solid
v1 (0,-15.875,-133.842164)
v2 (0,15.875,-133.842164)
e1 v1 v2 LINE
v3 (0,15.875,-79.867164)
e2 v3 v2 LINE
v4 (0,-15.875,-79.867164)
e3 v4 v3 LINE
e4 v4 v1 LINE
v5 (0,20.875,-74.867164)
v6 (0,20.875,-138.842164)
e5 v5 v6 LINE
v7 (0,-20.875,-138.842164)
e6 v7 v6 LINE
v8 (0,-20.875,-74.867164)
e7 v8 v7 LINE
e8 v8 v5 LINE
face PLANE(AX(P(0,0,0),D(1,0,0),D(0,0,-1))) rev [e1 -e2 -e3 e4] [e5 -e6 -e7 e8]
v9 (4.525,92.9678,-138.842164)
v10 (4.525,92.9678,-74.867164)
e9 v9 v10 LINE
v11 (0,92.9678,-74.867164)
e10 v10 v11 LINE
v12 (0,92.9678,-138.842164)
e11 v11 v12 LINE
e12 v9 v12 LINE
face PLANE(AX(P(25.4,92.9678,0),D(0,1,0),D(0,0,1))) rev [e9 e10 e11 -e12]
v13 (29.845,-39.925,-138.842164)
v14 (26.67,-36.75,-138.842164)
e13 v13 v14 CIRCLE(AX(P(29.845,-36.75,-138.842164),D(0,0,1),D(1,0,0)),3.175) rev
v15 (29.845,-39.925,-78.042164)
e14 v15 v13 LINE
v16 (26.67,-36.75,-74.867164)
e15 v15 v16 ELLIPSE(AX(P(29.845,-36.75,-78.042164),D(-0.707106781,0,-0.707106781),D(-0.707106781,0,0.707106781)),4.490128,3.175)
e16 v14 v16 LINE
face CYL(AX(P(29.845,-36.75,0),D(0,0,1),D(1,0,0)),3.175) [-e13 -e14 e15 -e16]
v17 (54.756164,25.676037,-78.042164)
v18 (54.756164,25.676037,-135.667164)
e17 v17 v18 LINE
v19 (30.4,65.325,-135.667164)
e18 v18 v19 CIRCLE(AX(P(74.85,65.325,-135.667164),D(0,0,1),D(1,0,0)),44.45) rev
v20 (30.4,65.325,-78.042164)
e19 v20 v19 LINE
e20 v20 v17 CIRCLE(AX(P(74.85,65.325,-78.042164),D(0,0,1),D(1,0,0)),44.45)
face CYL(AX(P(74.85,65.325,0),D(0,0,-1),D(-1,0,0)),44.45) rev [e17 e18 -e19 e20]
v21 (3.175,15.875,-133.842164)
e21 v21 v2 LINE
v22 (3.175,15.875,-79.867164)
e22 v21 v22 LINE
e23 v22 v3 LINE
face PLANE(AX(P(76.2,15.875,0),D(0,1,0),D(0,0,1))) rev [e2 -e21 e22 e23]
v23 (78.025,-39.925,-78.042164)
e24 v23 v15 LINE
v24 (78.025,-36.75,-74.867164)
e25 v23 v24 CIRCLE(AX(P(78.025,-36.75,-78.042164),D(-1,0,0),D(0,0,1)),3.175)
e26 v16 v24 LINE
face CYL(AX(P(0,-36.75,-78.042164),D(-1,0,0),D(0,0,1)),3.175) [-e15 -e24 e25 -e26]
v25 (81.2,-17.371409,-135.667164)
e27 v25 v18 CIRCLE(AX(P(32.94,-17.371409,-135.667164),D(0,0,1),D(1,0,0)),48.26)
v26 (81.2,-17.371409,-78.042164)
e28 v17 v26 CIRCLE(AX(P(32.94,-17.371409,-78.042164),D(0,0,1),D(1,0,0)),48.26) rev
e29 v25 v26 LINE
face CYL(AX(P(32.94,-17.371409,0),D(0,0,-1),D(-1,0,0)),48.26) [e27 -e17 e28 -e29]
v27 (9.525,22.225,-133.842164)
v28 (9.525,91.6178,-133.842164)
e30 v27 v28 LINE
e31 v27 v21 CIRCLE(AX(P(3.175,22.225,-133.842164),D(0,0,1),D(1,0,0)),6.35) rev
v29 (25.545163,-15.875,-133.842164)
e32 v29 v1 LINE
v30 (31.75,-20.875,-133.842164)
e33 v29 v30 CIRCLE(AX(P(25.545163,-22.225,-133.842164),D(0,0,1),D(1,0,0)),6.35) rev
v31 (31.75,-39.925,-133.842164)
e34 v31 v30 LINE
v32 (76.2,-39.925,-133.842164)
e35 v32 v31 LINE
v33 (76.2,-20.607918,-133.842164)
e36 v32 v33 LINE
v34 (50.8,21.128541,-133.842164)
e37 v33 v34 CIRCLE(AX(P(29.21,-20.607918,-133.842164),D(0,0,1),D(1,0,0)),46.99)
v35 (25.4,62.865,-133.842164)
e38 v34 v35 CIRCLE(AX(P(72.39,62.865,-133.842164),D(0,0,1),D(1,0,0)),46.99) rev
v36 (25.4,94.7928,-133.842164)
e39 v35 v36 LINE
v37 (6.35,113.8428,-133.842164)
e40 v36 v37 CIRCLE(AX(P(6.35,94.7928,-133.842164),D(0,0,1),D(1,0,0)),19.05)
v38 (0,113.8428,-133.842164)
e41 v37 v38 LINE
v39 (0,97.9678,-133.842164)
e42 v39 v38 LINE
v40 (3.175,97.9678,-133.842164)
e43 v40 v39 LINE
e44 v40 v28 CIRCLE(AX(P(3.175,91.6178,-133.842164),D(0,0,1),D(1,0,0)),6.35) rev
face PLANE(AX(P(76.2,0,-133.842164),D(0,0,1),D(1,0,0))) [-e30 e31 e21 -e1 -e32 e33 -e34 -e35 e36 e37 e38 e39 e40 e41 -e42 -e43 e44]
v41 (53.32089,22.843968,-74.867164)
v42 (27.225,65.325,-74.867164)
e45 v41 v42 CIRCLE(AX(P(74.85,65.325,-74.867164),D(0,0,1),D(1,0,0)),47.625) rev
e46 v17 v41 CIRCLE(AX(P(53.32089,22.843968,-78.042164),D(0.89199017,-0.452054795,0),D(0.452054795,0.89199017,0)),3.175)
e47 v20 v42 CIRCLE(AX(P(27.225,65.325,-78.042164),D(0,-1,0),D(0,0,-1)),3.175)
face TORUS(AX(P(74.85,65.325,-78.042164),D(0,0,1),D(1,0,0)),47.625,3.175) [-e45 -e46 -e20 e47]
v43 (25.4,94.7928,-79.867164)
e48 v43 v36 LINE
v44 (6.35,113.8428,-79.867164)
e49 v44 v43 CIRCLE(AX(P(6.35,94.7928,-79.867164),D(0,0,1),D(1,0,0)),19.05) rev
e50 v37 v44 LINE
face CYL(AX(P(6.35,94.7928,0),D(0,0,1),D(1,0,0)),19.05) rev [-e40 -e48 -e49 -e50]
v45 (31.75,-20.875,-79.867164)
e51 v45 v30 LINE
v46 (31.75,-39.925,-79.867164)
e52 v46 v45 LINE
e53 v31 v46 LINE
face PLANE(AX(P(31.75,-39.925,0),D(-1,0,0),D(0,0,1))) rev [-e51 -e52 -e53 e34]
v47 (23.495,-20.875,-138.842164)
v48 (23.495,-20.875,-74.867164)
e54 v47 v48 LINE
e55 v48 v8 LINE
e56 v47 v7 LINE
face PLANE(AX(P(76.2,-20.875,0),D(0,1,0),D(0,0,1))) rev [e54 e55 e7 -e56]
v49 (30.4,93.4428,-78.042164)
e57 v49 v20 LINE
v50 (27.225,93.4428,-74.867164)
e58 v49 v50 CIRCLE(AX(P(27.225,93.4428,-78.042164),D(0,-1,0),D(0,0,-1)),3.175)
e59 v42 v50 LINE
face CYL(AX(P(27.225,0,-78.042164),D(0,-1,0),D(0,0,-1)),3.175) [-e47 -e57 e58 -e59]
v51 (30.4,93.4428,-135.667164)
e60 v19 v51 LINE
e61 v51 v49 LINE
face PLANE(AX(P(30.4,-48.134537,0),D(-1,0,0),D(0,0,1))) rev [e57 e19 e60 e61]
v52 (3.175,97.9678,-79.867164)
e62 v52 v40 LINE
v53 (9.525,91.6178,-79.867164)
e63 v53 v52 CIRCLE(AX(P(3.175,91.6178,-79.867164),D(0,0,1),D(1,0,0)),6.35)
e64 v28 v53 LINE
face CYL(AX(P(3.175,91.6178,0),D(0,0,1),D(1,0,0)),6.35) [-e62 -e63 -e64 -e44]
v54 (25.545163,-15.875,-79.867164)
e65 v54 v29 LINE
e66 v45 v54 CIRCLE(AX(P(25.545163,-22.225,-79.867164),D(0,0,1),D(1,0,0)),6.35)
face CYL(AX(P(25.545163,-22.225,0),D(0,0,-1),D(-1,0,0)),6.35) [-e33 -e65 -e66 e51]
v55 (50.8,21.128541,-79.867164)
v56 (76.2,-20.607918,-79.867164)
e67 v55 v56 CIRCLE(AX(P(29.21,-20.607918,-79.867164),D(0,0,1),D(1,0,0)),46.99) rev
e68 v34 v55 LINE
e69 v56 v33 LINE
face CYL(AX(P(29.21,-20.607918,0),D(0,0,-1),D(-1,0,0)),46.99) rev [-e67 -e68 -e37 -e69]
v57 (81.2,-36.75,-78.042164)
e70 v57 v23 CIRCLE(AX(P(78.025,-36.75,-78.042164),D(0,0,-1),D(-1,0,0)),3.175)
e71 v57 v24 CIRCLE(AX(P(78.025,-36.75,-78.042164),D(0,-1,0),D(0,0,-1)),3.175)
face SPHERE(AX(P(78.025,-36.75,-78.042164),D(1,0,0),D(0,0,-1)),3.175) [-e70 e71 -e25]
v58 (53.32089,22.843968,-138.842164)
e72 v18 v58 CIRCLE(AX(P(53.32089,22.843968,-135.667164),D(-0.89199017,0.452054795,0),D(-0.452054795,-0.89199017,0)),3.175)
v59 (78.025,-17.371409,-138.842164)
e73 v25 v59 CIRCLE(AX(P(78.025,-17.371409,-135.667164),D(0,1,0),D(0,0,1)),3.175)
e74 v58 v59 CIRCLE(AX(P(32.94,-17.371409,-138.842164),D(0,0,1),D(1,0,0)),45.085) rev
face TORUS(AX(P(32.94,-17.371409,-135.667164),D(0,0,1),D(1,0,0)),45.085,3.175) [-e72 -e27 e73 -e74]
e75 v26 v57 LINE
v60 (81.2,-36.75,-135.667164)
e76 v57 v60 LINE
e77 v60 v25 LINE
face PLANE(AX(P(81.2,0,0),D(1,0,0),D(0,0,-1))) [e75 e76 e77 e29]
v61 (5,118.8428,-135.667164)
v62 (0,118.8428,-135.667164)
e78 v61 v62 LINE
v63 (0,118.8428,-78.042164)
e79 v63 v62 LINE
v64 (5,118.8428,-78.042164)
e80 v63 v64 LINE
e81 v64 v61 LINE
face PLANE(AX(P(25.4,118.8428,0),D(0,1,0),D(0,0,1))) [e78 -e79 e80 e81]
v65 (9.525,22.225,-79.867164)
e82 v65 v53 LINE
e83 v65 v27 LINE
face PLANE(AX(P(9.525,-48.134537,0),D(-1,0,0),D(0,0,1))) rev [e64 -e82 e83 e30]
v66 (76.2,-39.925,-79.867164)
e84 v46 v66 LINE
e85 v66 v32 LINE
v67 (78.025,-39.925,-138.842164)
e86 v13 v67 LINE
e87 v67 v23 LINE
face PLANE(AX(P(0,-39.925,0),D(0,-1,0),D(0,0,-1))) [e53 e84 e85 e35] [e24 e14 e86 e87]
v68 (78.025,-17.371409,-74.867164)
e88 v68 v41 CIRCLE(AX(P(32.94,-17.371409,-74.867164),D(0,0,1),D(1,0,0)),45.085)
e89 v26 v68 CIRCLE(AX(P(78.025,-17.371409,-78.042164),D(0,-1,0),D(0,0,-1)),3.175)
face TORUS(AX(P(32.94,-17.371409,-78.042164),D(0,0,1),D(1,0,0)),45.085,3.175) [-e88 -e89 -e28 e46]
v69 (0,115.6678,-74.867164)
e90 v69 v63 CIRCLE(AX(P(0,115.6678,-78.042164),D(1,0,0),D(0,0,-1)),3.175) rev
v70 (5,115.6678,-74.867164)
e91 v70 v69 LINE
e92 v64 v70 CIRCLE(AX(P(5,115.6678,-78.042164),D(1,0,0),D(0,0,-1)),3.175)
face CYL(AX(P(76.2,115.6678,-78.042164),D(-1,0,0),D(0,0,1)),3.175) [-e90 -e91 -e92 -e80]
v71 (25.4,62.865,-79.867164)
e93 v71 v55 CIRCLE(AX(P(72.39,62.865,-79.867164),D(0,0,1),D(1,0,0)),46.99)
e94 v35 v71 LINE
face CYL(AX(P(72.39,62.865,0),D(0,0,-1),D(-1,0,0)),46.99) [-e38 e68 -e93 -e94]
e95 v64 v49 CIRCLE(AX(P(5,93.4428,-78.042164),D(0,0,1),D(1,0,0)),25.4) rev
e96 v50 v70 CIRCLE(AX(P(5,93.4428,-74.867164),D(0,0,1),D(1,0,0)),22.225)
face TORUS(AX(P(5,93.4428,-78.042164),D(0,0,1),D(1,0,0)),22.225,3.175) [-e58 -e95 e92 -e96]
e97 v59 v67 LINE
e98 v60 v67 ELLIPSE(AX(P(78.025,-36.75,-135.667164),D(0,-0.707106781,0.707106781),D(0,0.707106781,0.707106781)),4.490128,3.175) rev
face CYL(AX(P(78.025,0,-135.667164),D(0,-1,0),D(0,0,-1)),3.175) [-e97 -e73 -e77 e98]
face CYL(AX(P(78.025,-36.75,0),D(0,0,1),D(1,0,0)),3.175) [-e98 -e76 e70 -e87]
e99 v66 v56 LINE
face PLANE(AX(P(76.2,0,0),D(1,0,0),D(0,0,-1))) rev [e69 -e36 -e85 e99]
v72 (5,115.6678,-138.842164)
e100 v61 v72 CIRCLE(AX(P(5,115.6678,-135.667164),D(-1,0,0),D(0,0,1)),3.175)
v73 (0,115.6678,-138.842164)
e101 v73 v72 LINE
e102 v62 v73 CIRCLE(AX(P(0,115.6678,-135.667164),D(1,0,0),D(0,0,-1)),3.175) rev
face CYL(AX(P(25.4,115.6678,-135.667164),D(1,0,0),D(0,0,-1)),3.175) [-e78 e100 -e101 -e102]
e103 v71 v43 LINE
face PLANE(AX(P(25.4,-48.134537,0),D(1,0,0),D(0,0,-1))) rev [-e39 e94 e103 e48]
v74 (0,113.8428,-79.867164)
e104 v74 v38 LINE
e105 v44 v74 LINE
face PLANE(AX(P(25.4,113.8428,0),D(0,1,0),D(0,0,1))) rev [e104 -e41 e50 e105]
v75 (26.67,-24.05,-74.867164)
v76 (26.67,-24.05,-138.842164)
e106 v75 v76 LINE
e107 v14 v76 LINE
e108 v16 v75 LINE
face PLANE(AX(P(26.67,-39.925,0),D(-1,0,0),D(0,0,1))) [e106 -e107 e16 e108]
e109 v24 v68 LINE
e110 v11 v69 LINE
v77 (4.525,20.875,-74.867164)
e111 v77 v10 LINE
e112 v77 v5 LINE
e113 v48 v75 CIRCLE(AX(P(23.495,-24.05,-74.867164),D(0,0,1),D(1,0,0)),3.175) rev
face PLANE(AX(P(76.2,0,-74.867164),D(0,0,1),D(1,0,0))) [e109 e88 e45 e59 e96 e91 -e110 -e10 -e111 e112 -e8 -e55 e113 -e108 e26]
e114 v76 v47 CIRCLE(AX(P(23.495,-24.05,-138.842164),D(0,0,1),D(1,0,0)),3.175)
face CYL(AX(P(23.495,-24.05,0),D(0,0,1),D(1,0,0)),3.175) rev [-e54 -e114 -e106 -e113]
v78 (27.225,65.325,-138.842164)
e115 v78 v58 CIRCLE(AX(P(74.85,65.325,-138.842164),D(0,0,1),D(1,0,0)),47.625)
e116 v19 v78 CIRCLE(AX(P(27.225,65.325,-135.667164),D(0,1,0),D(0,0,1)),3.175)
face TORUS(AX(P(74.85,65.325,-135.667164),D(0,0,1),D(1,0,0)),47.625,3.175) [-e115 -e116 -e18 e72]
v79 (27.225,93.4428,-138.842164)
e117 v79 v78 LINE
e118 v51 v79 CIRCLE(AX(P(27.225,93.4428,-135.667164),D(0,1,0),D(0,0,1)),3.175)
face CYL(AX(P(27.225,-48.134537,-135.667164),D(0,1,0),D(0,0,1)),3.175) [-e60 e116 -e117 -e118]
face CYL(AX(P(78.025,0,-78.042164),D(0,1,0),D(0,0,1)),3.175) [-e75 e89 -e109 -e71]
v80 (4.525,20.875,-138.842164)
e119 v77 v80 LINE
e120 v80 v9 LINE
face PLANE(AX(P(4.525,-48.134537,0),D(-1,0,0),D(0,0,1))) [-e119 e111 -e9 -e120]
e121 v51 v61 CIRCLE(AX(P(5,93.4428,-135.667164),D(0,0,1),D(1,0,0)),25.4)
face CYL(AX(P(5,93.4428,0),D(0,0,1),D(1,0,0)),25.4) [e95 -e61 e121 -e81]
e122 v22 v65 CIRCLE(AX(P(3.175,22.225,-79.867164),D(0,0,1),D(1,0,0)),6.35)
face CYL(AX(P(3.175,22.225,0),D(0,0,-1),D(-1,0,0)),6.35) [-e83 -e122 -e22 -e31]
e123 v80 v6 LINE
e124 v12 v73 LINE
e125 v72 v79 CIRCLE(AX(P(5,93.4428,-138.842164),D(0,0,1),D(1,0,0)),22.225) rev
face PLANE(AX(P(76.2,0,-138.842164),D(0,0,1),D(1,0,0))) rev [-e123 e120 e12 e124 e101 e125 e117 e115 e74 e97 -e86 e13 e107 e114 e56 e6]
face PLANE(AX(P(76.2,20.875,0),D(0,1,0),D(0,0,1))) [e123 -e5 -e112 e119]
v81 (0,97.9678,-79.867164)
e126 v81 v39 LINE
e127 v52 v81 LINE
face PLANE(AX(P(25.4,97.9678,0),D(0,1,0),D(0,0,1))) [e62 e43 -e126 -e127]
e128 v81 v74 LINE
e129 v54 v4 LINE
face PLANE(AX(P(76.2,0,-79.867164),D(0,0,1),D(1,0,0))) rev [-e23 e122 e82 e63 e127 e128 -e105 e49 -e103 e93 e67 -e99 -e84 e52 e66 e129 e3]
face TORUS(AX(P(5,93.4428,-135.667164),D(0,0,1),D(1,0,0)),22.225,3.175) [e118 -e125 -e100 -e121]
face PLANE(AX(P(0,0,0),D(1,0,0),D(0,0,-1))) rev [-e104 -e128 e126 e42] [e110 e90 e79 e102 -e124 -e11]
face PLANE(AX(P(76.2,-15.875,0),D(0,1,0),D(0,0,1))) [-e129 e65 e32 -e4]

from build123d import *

# Parameters (mm, degrees)
SKETCH1_W           = 53.975
SKETCH1_H           = 31.75
BOSS_EXTRUDE1_DEPTH = 76.2
SHELL1_T            = 5
SKETCH2_W           = 44.45
SKETCH2_H           = 53.975
CUT_EXTRUDE1_DEPTH  = 5
FILLET2_R           = 6.35
SKETCH3_W           = 54.53
SKETCH3_H           = 63.975
SKETCH3_W_2         = 44.45
SKETCH3_H_2         = 53.975
BOSS_EXTRUDE2_DEPTH = 19.05
FILLET5_R           = 3.175
FILLET6_R           = 3.175
SKETCH4_W           = 53.975
SKETCH4_H           = 15.875
BOSS_EXTRUDE3_DEPTH = 25.4
SHELL2_T            = 5
SKETCH5_W           = 15.875
SKETCH5_H           = 53.975
CUT_EXTRUDE2_DEPTH  = 5
SKETCH6_W           = 25.875
SKETCH6_H           = 63.975
SKETCH6_W_2         = 15.875
SKETCH6_H_2         = 53.975
BOSS_EXTRUDE4_DEPTH = 72.0928
SKETCH7_W           = 15.875
SKETCH7_H           = 53.975
CUT_EXTRUDE3_DEPTH  = 5
FILLET7_R           = 44.45
FILLET8_R           = 46.99
FILLET9_R           = 46.99
FILLET10_R          = 48.26
FILLET11_R          = 6.35
FILLET12_R          = 6.35
FILLET13_R          = 19.05
FILLET14_R          = 25.4
FILLET15_R          = 3.175


with BuildPart() as part:
    # Sketch1 → Boss-Extrude1 (new body)
    with BuildSketch(Plane(origin=(0, 0, 0), x_dir=(0, 0, -1), z_dir=(1, 0, 0))):
        with Locations((106.854663617, 0)):
            Rectangle(SKETCH1_W, SKETCH1_H)
    extrude(amount=BOSS_EXTRUDE1_DEPTH)

    # Shell1
    shell1_openings = [part.faces().sort_by_distance(p)[0] for p in [
        (0, 0, -106.854663617),
    ]]
    offset(amount=SHELL1_T, openings=shell1_openings, kind=Kind.INTERSECTION)

    # Sketch2 → Cut-Extrude1 (cut)
    with BuildSketch(Plane(origin=(0, -20.875, 0), x_dir=(-1, 0, 0), z_dir=(0, -1, 0))):
        with Locations((-53.975, 106.854663617)):
            Rectangle(SKETCH2_W, SKETCH2_H)
    extrude(amount=-CUT_EXTRUDE1_DEPTH, mode=Mode.SUBTRACT)

    # Fillet2
    # the kernel refuses this fillet: 6.35 mm, written as the material it takes off along each edge
    with BuildSketch(Plane(origin=(31.75, -15.875, -79.867163617), x_dir=(-1, 0, 0), z_dir=(0, 0, -1))) as fillet2_piece_1:
        with BuildLine():
            CenterArc((6.204836823, -6.35), FILLET2_R, 90, 77.725329785)
            Line((0, -5), (0, 0))
            Line((0, 0), (6.204836823, 0))
        make_face()
    extrude(amount=53.975, mode=Mode.SUBTRACT)

    # Sketch3 → Boss-Extrude2 (add)
    with BuildSketch(Plane.XZ.offset(20.875)):
        with Locations((53.935, -106.854663617)):
            Rectangle(SKETCH3_W, SKETCH3_H)
        with Locations((53.975, -106.854663617)):
            Rectangle(SKETCH3_W_2, SKETCH3_H_2, mode=Mode.SUBTRACT)
    extrude(amount=BOSS_EXTRUDE2_DEPTH)

    # Fillet5
    fillet5_edges = [part.edges().sort_by_distance(p)[0] for p in [
        (26.67, -20.875, -106.854663617),
    ]]
    fillet(fillet5_edges, radius=FILLET5_R)

    # Fillet6
    fillet6_edges = [part.edges().sort_by_distance(p)[0] for p in [
        (26.67, -39.925, -106.854663617),
        (53.935, -39.925, -74.867163617),
    ]]
    fillet(fillet6_edges, radius=FILLET6_R)



with BuildPart() as body_2:
    # Sketch4 → Boss-Extrude3 (new body)
    with BuildSketch(Plane(origin=(0, 0, 0), x_dir=(0, 0, -1), z_dir=(1, 0, 0))):
        with Locations((106.854663617, 105.9053)):
            Rectangle(SKETCH4_W, SKETCH4_H)
    extrude(amount=BOSS_EXTRUDE3_DEPTH)

    # Shell2
    shell2_openings = [body_2.faces().sort_by_distance(p)[0] for p in [
        (0, 105.9053, -106.854663617),
    ]]
    offset(amount=SHELL2_T, openings=shell2_openings, kind=Kind.INTERSECTION)

    # Sketch5 → Cut-Extrude2 (cut)
    with BuildSketch(Plane.XZ.offset(-92.9678)):
        with Locations((17.4625, -106.854663617)):
            Rectangle(SKETCH5_W, SKETCH5_H)
    extrude(amount=-CUT_EXTRUDE2_DEPTH, mode=Mode.SUBTRACT)


with BuildPart() as part_1:
    add(part.part)

    add(body_2.part)  # Boss-Extrude4 merges body 2
    # Sketch6 → Boss-Extrude4 (add)
    with BuildSketch(Plane.XZ.offset(-92.9678)):
        with Locations((17.4625, -106.854663617)):
            Rectangle(SKETCH6_W, SKETCH6_H)
        with Locations((17.4625, -106.854663617)):
            Rectangle(SKETCH6_W_2, SKETCH6_H_2, mode=Mode.SUBTRACT)
    extrude(amount=BOSS_EXTRUDE4_DEPTH)

    # Sketch7 → Cut-Extrude3 (cut)
    with BuildSketch(Plane.XZ.offset(-15.875)):
        with Locations((17.4625, -106.854663617)):
            Rectangle(SKETCH7_W, SKETCH7_H)
    extrude(amount=-CUT_EXTRUDE3_DEPTH, mode=Mode.SUBTRACT)

    # Fillet7
    fillet7_edges = [part_1.edges().sort_by_distance(p)[0] for p in [
        (30.4, 20.875, -106.854663617),
    ]]
    fillet(fillet7_edges, radius=FILLET7_R)

    # Fillet8
    fillet8_edges = [part_1.edges().sort_by_distance(p)[0] for p in [
        (25.4, 15.875, -106.854663617),
    ]]
    fillet(fillet8_edges, radius=FILLET8_R)

    # Fillet9
    fillet9_edges = [part_1.edges().sort_by_distance(p)[0] for p in [
        (76.2, 15.875, -106.854663617),
    ]]
    fillet(fillet9_edges, radius=FILLET9_R)

    # Fillet10
    fillet10_edges = [part_1.edges().sort_by_distance(p)[0] for p in [
        (81.2, 20.875, -106.854663617),
    ]]
    fillet(fillet10_edges, radius=FILLET10_R)

    # Fillet11
    fillet11_edges = [part_1.edges().sort_by_distance(p)[0] for p in [
        (9.525, 15.875, -106.854663617),
    ]]
    fillet(fillet11_edges, radius=FILLET11_R)

    # Fillet12
    fillet12_edges = [part_1.edges().sort_by_distance(p)[0] for p in [
        (9.525, 97.9678, -106.854663617),
    ]]
    fillet(fillet12_edges, radius=FILLET12_R)

    # Fillet13
    fillet13_edges = [part_1.edges().sort_by_distance(p)[0] for p in [
        (25.4, 113.8428, -106.854663617),
    ]]
    fillet(fillet13_edges, radius=FILLET13_R)

    # Fillet14
    fillet14_edges = [part_1.edges().sort_by_distance(p)[0] for p in [
        (30.4, 118.8428, -106.854663617),
    ]]
    fillet(fillet14_edges, radius=FILLET14_R)

    # Fillet15
    fillet15_edges = [part_1.edges().sort_by_distance(p)[0] for p in [
        (81.2, -28.648204314, -138.842163617),
        (30.4, 79.3839, -74.867163617),
        (30.4, 79.3839, -138.842163617),
        (36.975381235, 42.058806641, -138.842163617),
        (36.975381235, 42.058806641, -74.867163617),
        (74.061014659, 7.889029876, -138.842163617),
        (74.061014659, 7.889029876, -74.867163617),
        (2.5, 118.8428, -74.867163617),
        (2.5, 118.8428, -138.842163617),
        (22.960512242, 111.403312242, -138.842163617),
        (22.960512242, 111.403312242, -74.867163617),
        (81.2, -39.925, -108.442163617),
        (81.2, -27.060704314, -74.867163617),
        (81.2, -38.99506403, -75.797099587),
    ]]
    fillet(fillet15_edges, radius=FILLET15_R)


solid = part_1.part
